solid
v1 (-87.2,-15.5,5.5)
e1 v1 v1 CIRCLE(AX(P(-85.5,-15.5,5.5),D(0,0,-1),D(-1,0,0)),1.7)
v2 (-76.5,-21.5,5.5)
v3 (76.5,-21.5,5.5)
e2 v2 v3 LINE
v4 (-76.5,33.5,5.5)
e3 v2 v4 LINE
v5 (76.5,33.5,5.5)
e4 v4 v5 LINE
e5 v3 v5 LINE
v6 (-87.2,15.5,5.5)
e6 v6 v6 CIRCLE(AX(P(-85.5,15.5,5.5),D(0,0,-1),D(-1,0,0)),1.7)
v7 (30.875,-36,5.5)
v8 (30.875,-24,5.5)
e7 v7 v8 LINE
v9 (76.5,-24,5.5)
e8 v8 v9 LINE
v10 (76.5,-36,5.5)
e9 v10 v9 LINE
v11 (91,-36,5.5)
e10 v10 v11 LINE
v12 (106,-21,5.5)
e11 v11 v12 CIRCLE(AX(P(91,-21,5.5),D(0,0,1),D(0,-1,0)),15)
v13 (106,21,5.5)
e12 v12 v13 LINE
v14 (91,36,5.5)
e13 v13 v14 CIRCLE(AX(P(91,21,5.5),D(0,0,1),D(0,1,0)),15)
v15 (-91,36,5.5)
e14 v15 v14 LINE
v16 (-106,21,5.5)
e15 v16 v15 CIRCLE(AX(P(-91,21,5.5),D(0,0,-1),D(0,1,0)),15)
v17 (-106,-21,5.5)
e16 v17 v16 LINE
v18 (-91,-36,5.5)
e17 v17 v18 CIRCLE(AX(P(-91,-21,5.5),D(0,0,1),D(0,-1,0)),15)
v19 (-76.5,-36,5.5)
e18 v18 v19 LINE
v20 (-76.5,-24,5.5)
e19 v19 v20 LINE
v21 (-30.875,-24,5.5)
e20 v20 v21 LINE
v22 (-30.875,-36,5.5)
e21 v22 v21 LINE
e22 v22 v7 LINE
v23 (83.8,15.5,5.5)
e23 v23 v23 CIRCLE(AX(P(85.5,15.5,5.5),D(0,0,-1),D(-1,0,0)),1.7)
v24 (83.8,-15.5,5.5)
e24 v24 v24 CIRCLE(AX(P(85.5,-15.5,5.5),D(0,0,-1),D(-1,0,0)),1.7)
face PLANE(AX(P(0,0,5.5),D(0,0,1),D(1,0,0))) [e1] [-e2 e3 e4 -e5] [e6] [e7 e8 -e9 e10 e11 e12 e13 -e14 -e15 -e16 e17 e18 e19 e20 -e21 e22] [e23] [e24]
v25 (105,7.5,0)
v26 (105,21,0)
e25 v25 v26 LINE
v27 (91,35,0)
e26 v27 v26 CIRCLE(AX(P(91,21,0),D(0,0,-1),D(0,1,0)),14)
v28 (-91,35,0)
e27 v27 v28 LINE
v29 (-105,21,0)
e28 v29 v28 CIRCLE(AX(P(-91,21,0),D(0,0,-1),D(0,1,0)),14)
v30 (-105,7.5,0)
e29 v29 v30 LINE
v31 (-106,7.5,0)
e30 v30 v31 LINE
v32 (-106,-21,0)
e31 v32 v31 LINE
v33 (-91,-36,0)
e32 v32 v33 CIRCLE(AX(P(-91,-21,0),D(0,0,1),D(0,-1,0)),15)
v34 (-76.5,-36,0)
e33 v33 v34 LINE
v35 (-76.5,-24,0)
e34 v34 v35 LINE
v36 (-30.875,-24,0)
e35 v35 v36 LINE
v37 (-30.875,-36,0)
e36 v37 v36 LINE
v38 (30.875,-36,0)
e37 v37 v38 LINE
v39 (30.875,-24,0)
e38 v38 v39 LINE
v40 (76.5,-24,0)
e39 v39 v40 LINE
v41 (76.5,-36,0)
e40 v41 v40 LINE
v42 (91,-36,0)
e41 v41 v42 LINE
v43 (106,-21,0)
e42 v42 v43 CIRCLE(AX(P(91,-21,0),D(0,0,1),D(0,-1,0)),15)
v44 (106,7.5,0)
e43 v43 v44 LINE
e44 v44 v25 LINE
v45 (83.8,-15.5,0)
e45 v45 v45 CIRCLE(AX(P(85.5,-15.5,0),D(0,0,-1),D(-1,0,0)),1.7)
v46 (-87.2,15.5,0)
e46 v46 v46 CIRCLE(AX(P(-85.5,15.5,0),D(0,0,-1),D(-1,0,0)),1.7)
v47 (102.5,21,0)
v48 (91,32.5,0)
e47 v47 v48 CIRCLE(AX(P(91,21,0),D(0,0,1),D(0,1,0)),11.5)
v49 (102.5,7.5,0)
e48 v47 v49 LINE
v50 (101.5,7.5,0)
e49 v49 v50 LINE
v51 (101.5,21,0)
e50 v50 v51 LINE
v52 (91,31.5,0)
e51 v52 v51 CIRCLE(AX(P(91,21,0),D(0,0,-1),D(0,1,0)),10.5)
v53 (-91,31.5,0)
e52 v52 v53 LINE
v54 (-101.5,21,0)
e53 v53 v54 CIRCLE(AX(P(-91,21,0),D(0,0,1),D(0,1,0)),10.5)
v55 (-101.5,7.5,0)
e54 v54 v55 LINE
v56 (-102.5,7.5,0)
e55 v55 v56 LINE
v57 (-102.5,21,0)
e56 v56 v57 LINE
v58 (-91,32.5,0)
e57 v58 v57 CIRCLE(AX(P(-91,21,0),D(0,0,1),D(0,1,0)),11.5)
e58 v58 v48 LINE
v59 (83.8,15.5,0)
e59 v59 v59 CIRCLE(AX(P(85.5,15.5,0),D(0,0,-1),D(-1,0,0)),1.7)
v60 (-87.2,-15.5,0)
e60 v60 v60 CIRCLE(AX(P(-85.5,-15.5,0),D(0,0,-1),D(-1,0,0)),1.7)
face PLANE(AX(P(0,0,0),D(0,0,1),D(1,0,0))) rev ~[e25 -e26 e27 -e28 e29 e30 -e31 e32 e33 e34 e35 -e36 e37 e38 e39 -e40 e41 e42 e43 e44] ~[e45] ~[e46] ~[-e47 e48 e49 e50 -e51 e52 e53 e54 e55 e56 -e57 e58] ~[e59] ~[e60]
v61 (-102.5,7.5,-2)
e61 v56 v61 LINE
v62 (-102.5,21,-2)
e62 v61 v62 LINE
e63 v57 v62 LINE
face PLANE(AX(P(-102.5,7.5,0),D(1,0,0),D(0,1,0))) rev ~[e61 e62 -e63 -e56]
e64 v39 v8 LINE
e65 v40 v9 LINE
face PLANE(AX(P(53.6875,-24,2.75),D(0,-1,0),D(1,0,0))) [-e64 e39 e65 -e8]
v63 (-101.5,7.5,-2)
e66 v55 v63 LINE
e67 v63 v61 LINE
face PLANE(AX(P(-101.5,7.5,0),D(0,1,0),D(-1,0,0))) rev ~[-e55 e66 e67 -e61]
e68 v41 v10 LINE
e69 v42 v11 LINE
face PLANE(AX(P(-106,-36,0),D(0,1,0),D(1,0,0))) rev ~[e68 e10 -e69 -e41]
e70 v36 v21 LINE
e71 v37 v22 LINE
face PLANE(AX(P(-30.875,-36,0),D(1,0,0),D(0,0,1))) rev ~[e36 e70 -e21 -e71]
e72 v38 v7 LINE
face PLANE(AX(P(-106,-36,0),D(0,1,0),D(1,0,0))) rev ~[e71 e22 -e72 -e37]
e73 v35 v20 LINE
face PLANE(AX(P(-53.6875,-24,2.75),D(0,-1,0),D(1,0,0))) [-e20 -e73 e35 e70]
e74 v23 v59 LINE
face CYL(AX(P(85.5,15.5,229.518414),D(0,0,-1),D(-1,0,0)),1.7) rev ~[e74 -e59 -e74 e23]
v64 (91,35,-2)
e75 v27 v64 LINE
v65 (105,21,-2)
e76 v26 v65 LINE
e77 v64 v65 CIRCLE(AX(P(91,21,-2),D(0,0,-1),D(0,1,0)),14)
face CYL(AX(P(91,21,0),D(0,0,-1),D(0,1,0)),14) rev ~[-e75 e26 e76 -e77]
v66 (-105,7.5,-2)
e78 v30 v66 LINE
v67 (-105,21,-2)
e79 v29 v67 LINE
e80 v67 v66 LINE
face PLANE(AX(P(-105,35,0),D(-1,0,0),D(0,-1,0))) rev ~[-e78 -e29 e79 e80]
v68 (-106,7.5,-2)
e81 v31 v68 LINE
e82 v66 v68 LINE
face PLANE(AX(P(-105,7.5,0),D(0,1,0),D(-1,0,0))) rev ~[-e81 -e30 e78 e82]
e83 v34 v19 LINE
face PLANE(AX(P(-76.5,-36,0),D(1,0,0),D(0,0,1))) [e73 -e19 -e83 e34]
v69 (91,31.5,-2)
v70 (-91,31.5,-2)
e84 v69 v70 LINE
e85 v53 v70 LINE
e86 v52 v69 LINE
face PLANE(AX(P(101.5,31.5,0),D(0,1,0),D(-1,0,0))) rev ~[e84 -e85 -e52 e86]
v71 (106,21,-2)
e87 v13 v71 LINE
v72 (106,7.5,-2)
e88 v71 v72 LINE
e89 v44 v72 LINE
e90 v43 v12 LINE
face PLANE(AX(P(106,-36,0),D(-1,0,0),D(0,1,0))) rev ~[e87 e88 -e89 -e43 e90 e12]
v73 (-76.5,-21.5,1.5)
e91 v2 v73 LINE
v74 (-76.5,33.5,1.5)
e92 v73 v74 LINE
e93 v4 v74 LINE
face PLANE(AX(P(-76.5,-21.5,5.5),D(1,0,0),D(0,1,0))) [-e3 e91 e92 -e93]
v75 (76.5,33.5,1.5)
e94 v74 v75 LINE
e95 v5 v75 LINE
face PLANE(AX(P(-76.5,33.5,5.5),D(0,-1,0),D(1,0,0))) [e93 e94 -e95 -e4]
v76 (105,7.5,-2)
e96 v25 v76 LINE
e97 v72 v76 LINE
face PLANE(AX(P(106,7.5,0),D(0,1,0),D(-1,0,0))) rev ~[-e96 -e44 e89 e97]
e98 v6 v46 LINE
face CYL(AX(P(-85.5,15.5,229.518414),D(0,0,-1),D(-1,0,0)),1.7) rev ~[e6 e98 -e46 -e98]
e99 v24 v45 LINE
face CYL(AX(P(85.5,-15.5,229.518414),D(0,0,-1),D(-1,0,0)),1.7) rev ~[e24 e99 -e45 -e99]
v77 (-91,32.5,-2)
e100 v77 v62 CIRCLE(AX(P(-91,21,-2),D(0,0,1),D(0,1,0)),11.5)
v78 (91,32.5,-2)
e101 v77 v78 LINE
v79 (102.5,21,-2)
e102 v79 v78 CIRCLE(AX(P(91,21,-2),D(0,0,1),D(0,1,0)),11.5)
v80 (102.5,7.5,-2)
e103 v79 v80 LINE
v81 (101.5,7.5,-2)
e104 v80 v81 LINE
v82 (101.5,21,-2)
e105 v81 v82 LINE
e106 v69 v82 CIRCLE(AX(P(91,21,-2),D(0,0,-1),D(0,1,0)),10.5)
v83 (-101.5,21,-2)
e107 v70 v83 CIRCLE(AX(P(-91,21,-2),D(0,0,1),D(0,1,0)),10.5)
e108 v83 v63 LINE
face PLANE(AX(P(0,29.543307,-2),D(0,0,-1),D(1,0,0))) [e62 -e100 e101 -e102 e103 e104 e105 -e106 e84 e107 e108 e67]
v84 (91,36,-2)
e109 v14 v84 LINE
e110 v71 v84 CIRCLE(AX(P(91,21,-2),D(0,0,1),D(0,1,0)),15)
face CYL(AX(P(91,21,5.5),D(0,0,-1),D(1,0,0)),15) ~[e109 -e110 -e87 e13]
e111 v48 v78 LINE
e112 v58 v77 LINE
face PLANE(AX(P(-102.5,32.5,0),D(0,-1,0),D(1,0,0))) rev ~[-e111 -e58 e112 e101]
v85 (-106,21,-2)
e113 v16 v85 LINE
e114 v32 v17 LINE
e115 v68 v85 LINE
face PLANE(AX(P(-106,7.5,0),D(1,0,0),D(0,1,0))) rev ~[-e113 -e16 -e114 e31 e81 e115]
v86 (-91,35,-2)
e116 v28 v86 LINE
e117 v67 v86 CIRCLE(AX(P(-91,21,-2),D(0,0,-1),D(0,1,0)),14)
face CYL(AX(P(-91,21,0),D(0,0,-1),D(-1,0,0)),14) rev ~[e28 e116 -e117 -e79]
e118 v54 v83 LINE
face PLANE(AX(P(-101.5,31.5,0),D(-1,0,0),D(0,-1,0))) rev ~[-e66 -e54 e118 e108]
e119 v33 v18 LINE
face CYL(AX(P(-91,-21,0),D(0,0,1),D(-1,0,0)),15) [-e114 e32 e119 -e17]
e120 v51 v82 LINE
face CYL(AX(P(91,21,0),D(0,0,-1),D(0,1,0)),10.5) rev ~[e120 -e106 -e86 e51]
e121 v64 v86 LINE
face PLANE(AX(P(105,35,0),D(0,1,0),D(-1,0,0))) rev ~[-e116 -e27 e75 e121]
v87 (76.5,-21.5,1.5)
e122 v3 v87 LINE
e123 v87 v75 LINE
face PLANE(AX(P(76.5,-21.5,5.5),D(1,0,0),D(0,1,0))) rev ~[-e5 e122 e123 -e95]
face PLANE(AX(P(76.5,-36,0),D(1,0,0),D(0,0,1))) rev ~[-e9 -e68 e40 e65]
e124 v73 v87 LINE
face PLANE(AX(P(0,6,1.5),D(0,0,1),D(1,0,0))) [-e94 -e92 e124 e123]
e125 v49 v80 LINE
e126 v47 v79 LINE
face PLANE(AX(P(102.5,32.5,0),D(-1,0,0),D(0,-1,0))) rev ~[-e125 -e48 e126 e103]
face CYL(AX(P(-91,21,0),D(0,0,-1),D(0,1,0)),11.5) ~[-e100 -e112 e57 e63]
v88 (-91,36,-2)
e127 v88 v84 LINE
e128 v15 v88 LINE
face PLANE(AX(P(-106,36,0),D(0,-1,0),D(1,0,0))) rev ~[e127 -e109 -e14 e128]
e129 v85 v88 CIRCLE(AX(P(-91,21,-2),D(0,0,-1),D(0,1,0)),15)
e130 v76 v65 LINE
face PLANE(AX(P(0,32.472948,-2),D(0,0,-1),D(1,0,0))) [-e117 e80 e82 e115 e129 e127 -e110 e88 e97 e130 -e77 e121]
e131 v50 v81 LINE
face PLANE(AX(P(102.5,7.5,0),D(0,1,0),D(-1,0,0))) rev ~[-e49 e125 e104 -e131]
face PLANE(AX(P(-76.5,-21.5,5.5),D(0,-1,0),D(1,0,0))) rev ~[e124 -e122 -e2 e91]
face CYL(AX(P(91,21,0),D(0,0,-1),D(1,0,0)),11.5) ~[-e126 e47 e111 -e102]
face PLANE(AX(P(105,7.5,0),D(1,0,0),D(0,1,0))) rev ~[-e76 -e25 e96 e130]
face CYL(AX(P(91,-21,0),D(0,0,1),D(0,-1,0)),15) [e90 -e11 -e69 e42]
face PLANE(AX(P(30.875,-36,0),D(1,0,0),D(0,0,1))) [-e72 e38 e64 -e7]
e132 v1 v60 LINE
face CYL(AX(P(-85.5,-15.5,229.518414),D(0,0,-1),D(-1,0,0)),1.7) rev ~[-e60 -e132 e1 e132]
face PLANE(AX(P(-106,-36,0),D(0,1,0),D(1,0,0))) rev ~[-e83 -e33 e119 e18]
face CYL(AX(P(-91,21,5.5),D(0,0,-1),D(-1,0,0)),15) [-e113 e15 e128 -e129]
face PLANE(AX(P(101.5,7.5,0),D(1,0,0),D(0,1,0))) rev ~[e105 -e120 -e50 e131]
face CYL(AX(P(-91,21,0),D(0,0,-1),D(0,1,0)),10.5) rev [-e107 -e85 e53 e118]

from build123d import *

# Parameters (mm, degrees)
F0_W      = 212
F0_H      = 72
F1_DEPTH  = 5.5
F2_R      = 15
F3_W      = 45.625
F3_H      = 5.5
F4_DEPTH  = 12
F6_DEPTH  = 2
F7_R      = 10.5
F8_R      = 11.5
F9_R      = 14
F10_R     = 15
F11_W     = 153
F11_H     = 55
F12_DEPTH = 4
F14_D     = 3.4


# Not quite as in the source:
# - a feature names something its author has since deleted; it is built from what else it names


with BuildPart() as f1:
    # F0 (on Top) → F1 (new body)
    with BuildSketch(Plane.XY):
        Rectangle(F0_W, F0_H)
    extrude(amount=F1_DEPTH)

    # F2
    f2_edges = [f1.edges().sort_by_distance(p)[0] for p in [
        (-106, -36, 2.75),
        (106, -36, 2.75),
    ]]
    fillet(f2_edges, radius=F2_R)

    # F3 (on face) → F4 (cut)
    with BuildSketch(Plane.XZ.offset(36)):
        with Locations((-53.6875, 2.75)):
            Rectangle(F3_W, F3_H)
        with Locations((53.6875, 2.75)):
            Rectangle(F3_W, F3_H)
    extrude(amount=-F4_DEPTH, mode=Mode.SUBTRACT)

    # F5 (on face) → F6 (join)
    with BuildSketch(Plane(origin=(0, 0, 0), x_dir=(1, 0, 0), z_dir=(0, 0, -1))):
        Polygon((-105, -7.5), (-106, -7.5), (-106, -36), (106, -36), (106, -7.5), (105, -7.5), (105, -35), (-105, -35), align=None)
        Polygon((101.5, -31.5), (-101.5, -31.5), (-101.5, -7.5), (-102.5, -7.5), (-102.5, -32.5), (102.5, -32.5), (102.5, -7.5), (101.5, -7.5), align=None)
    extrude(amount=F6_DEPTH)

    # F7
    f7_edges = [f1.edges().sort_by_distance(p)[0] for p in [
        (101.5, 31.5, -1),
        (-101.5, 31.5, -1),
    ]]
    fillet(f7_edges, radius=F7_R)

    # F8
    f8_edges = [f1.edges().sort_by_distance(p)[0] for p in [
        (102.5, 32.5, -1),
        (-102.5, 32.5, -1),
    ]]
    fillet(f8_edges, radius=F8_R)

    # F9
    f9_edges = [f1.edges().sort_by_distance(p)[0] for p in [
        (105, 35, -1),
        (-105, 35, -1),
    ]]
    fillet(f9_edges, radius=F9_R)

    # F10
    f10_edges = [f1.edges().sort_by_distance(p)[0] for p in [
        (106, 36, 1.75),
        (-106, 36, 1.75),
    ]]
    fillet(f10_edges, radius=F10_R)

    # F11 (on face) → F12 (cut)
    with BuildSketch(Plane.XY.offset(5.5)):
        with Locations((0, 6)):
            Rectangle(F11_W, F11_H)
    extrude(amount=-F12_DEPTH, mode=Mode.SUBTRACT)

    # F14 (through all)
    with Locations(Plane.XY.offset(5.5)):
        with Locations((-85.5, 15.5), (85.5, 15.5), (85.5, -15.5), (-85.5, -15.5)):
            Hole(F14_D / 2)


solid = f1.part
